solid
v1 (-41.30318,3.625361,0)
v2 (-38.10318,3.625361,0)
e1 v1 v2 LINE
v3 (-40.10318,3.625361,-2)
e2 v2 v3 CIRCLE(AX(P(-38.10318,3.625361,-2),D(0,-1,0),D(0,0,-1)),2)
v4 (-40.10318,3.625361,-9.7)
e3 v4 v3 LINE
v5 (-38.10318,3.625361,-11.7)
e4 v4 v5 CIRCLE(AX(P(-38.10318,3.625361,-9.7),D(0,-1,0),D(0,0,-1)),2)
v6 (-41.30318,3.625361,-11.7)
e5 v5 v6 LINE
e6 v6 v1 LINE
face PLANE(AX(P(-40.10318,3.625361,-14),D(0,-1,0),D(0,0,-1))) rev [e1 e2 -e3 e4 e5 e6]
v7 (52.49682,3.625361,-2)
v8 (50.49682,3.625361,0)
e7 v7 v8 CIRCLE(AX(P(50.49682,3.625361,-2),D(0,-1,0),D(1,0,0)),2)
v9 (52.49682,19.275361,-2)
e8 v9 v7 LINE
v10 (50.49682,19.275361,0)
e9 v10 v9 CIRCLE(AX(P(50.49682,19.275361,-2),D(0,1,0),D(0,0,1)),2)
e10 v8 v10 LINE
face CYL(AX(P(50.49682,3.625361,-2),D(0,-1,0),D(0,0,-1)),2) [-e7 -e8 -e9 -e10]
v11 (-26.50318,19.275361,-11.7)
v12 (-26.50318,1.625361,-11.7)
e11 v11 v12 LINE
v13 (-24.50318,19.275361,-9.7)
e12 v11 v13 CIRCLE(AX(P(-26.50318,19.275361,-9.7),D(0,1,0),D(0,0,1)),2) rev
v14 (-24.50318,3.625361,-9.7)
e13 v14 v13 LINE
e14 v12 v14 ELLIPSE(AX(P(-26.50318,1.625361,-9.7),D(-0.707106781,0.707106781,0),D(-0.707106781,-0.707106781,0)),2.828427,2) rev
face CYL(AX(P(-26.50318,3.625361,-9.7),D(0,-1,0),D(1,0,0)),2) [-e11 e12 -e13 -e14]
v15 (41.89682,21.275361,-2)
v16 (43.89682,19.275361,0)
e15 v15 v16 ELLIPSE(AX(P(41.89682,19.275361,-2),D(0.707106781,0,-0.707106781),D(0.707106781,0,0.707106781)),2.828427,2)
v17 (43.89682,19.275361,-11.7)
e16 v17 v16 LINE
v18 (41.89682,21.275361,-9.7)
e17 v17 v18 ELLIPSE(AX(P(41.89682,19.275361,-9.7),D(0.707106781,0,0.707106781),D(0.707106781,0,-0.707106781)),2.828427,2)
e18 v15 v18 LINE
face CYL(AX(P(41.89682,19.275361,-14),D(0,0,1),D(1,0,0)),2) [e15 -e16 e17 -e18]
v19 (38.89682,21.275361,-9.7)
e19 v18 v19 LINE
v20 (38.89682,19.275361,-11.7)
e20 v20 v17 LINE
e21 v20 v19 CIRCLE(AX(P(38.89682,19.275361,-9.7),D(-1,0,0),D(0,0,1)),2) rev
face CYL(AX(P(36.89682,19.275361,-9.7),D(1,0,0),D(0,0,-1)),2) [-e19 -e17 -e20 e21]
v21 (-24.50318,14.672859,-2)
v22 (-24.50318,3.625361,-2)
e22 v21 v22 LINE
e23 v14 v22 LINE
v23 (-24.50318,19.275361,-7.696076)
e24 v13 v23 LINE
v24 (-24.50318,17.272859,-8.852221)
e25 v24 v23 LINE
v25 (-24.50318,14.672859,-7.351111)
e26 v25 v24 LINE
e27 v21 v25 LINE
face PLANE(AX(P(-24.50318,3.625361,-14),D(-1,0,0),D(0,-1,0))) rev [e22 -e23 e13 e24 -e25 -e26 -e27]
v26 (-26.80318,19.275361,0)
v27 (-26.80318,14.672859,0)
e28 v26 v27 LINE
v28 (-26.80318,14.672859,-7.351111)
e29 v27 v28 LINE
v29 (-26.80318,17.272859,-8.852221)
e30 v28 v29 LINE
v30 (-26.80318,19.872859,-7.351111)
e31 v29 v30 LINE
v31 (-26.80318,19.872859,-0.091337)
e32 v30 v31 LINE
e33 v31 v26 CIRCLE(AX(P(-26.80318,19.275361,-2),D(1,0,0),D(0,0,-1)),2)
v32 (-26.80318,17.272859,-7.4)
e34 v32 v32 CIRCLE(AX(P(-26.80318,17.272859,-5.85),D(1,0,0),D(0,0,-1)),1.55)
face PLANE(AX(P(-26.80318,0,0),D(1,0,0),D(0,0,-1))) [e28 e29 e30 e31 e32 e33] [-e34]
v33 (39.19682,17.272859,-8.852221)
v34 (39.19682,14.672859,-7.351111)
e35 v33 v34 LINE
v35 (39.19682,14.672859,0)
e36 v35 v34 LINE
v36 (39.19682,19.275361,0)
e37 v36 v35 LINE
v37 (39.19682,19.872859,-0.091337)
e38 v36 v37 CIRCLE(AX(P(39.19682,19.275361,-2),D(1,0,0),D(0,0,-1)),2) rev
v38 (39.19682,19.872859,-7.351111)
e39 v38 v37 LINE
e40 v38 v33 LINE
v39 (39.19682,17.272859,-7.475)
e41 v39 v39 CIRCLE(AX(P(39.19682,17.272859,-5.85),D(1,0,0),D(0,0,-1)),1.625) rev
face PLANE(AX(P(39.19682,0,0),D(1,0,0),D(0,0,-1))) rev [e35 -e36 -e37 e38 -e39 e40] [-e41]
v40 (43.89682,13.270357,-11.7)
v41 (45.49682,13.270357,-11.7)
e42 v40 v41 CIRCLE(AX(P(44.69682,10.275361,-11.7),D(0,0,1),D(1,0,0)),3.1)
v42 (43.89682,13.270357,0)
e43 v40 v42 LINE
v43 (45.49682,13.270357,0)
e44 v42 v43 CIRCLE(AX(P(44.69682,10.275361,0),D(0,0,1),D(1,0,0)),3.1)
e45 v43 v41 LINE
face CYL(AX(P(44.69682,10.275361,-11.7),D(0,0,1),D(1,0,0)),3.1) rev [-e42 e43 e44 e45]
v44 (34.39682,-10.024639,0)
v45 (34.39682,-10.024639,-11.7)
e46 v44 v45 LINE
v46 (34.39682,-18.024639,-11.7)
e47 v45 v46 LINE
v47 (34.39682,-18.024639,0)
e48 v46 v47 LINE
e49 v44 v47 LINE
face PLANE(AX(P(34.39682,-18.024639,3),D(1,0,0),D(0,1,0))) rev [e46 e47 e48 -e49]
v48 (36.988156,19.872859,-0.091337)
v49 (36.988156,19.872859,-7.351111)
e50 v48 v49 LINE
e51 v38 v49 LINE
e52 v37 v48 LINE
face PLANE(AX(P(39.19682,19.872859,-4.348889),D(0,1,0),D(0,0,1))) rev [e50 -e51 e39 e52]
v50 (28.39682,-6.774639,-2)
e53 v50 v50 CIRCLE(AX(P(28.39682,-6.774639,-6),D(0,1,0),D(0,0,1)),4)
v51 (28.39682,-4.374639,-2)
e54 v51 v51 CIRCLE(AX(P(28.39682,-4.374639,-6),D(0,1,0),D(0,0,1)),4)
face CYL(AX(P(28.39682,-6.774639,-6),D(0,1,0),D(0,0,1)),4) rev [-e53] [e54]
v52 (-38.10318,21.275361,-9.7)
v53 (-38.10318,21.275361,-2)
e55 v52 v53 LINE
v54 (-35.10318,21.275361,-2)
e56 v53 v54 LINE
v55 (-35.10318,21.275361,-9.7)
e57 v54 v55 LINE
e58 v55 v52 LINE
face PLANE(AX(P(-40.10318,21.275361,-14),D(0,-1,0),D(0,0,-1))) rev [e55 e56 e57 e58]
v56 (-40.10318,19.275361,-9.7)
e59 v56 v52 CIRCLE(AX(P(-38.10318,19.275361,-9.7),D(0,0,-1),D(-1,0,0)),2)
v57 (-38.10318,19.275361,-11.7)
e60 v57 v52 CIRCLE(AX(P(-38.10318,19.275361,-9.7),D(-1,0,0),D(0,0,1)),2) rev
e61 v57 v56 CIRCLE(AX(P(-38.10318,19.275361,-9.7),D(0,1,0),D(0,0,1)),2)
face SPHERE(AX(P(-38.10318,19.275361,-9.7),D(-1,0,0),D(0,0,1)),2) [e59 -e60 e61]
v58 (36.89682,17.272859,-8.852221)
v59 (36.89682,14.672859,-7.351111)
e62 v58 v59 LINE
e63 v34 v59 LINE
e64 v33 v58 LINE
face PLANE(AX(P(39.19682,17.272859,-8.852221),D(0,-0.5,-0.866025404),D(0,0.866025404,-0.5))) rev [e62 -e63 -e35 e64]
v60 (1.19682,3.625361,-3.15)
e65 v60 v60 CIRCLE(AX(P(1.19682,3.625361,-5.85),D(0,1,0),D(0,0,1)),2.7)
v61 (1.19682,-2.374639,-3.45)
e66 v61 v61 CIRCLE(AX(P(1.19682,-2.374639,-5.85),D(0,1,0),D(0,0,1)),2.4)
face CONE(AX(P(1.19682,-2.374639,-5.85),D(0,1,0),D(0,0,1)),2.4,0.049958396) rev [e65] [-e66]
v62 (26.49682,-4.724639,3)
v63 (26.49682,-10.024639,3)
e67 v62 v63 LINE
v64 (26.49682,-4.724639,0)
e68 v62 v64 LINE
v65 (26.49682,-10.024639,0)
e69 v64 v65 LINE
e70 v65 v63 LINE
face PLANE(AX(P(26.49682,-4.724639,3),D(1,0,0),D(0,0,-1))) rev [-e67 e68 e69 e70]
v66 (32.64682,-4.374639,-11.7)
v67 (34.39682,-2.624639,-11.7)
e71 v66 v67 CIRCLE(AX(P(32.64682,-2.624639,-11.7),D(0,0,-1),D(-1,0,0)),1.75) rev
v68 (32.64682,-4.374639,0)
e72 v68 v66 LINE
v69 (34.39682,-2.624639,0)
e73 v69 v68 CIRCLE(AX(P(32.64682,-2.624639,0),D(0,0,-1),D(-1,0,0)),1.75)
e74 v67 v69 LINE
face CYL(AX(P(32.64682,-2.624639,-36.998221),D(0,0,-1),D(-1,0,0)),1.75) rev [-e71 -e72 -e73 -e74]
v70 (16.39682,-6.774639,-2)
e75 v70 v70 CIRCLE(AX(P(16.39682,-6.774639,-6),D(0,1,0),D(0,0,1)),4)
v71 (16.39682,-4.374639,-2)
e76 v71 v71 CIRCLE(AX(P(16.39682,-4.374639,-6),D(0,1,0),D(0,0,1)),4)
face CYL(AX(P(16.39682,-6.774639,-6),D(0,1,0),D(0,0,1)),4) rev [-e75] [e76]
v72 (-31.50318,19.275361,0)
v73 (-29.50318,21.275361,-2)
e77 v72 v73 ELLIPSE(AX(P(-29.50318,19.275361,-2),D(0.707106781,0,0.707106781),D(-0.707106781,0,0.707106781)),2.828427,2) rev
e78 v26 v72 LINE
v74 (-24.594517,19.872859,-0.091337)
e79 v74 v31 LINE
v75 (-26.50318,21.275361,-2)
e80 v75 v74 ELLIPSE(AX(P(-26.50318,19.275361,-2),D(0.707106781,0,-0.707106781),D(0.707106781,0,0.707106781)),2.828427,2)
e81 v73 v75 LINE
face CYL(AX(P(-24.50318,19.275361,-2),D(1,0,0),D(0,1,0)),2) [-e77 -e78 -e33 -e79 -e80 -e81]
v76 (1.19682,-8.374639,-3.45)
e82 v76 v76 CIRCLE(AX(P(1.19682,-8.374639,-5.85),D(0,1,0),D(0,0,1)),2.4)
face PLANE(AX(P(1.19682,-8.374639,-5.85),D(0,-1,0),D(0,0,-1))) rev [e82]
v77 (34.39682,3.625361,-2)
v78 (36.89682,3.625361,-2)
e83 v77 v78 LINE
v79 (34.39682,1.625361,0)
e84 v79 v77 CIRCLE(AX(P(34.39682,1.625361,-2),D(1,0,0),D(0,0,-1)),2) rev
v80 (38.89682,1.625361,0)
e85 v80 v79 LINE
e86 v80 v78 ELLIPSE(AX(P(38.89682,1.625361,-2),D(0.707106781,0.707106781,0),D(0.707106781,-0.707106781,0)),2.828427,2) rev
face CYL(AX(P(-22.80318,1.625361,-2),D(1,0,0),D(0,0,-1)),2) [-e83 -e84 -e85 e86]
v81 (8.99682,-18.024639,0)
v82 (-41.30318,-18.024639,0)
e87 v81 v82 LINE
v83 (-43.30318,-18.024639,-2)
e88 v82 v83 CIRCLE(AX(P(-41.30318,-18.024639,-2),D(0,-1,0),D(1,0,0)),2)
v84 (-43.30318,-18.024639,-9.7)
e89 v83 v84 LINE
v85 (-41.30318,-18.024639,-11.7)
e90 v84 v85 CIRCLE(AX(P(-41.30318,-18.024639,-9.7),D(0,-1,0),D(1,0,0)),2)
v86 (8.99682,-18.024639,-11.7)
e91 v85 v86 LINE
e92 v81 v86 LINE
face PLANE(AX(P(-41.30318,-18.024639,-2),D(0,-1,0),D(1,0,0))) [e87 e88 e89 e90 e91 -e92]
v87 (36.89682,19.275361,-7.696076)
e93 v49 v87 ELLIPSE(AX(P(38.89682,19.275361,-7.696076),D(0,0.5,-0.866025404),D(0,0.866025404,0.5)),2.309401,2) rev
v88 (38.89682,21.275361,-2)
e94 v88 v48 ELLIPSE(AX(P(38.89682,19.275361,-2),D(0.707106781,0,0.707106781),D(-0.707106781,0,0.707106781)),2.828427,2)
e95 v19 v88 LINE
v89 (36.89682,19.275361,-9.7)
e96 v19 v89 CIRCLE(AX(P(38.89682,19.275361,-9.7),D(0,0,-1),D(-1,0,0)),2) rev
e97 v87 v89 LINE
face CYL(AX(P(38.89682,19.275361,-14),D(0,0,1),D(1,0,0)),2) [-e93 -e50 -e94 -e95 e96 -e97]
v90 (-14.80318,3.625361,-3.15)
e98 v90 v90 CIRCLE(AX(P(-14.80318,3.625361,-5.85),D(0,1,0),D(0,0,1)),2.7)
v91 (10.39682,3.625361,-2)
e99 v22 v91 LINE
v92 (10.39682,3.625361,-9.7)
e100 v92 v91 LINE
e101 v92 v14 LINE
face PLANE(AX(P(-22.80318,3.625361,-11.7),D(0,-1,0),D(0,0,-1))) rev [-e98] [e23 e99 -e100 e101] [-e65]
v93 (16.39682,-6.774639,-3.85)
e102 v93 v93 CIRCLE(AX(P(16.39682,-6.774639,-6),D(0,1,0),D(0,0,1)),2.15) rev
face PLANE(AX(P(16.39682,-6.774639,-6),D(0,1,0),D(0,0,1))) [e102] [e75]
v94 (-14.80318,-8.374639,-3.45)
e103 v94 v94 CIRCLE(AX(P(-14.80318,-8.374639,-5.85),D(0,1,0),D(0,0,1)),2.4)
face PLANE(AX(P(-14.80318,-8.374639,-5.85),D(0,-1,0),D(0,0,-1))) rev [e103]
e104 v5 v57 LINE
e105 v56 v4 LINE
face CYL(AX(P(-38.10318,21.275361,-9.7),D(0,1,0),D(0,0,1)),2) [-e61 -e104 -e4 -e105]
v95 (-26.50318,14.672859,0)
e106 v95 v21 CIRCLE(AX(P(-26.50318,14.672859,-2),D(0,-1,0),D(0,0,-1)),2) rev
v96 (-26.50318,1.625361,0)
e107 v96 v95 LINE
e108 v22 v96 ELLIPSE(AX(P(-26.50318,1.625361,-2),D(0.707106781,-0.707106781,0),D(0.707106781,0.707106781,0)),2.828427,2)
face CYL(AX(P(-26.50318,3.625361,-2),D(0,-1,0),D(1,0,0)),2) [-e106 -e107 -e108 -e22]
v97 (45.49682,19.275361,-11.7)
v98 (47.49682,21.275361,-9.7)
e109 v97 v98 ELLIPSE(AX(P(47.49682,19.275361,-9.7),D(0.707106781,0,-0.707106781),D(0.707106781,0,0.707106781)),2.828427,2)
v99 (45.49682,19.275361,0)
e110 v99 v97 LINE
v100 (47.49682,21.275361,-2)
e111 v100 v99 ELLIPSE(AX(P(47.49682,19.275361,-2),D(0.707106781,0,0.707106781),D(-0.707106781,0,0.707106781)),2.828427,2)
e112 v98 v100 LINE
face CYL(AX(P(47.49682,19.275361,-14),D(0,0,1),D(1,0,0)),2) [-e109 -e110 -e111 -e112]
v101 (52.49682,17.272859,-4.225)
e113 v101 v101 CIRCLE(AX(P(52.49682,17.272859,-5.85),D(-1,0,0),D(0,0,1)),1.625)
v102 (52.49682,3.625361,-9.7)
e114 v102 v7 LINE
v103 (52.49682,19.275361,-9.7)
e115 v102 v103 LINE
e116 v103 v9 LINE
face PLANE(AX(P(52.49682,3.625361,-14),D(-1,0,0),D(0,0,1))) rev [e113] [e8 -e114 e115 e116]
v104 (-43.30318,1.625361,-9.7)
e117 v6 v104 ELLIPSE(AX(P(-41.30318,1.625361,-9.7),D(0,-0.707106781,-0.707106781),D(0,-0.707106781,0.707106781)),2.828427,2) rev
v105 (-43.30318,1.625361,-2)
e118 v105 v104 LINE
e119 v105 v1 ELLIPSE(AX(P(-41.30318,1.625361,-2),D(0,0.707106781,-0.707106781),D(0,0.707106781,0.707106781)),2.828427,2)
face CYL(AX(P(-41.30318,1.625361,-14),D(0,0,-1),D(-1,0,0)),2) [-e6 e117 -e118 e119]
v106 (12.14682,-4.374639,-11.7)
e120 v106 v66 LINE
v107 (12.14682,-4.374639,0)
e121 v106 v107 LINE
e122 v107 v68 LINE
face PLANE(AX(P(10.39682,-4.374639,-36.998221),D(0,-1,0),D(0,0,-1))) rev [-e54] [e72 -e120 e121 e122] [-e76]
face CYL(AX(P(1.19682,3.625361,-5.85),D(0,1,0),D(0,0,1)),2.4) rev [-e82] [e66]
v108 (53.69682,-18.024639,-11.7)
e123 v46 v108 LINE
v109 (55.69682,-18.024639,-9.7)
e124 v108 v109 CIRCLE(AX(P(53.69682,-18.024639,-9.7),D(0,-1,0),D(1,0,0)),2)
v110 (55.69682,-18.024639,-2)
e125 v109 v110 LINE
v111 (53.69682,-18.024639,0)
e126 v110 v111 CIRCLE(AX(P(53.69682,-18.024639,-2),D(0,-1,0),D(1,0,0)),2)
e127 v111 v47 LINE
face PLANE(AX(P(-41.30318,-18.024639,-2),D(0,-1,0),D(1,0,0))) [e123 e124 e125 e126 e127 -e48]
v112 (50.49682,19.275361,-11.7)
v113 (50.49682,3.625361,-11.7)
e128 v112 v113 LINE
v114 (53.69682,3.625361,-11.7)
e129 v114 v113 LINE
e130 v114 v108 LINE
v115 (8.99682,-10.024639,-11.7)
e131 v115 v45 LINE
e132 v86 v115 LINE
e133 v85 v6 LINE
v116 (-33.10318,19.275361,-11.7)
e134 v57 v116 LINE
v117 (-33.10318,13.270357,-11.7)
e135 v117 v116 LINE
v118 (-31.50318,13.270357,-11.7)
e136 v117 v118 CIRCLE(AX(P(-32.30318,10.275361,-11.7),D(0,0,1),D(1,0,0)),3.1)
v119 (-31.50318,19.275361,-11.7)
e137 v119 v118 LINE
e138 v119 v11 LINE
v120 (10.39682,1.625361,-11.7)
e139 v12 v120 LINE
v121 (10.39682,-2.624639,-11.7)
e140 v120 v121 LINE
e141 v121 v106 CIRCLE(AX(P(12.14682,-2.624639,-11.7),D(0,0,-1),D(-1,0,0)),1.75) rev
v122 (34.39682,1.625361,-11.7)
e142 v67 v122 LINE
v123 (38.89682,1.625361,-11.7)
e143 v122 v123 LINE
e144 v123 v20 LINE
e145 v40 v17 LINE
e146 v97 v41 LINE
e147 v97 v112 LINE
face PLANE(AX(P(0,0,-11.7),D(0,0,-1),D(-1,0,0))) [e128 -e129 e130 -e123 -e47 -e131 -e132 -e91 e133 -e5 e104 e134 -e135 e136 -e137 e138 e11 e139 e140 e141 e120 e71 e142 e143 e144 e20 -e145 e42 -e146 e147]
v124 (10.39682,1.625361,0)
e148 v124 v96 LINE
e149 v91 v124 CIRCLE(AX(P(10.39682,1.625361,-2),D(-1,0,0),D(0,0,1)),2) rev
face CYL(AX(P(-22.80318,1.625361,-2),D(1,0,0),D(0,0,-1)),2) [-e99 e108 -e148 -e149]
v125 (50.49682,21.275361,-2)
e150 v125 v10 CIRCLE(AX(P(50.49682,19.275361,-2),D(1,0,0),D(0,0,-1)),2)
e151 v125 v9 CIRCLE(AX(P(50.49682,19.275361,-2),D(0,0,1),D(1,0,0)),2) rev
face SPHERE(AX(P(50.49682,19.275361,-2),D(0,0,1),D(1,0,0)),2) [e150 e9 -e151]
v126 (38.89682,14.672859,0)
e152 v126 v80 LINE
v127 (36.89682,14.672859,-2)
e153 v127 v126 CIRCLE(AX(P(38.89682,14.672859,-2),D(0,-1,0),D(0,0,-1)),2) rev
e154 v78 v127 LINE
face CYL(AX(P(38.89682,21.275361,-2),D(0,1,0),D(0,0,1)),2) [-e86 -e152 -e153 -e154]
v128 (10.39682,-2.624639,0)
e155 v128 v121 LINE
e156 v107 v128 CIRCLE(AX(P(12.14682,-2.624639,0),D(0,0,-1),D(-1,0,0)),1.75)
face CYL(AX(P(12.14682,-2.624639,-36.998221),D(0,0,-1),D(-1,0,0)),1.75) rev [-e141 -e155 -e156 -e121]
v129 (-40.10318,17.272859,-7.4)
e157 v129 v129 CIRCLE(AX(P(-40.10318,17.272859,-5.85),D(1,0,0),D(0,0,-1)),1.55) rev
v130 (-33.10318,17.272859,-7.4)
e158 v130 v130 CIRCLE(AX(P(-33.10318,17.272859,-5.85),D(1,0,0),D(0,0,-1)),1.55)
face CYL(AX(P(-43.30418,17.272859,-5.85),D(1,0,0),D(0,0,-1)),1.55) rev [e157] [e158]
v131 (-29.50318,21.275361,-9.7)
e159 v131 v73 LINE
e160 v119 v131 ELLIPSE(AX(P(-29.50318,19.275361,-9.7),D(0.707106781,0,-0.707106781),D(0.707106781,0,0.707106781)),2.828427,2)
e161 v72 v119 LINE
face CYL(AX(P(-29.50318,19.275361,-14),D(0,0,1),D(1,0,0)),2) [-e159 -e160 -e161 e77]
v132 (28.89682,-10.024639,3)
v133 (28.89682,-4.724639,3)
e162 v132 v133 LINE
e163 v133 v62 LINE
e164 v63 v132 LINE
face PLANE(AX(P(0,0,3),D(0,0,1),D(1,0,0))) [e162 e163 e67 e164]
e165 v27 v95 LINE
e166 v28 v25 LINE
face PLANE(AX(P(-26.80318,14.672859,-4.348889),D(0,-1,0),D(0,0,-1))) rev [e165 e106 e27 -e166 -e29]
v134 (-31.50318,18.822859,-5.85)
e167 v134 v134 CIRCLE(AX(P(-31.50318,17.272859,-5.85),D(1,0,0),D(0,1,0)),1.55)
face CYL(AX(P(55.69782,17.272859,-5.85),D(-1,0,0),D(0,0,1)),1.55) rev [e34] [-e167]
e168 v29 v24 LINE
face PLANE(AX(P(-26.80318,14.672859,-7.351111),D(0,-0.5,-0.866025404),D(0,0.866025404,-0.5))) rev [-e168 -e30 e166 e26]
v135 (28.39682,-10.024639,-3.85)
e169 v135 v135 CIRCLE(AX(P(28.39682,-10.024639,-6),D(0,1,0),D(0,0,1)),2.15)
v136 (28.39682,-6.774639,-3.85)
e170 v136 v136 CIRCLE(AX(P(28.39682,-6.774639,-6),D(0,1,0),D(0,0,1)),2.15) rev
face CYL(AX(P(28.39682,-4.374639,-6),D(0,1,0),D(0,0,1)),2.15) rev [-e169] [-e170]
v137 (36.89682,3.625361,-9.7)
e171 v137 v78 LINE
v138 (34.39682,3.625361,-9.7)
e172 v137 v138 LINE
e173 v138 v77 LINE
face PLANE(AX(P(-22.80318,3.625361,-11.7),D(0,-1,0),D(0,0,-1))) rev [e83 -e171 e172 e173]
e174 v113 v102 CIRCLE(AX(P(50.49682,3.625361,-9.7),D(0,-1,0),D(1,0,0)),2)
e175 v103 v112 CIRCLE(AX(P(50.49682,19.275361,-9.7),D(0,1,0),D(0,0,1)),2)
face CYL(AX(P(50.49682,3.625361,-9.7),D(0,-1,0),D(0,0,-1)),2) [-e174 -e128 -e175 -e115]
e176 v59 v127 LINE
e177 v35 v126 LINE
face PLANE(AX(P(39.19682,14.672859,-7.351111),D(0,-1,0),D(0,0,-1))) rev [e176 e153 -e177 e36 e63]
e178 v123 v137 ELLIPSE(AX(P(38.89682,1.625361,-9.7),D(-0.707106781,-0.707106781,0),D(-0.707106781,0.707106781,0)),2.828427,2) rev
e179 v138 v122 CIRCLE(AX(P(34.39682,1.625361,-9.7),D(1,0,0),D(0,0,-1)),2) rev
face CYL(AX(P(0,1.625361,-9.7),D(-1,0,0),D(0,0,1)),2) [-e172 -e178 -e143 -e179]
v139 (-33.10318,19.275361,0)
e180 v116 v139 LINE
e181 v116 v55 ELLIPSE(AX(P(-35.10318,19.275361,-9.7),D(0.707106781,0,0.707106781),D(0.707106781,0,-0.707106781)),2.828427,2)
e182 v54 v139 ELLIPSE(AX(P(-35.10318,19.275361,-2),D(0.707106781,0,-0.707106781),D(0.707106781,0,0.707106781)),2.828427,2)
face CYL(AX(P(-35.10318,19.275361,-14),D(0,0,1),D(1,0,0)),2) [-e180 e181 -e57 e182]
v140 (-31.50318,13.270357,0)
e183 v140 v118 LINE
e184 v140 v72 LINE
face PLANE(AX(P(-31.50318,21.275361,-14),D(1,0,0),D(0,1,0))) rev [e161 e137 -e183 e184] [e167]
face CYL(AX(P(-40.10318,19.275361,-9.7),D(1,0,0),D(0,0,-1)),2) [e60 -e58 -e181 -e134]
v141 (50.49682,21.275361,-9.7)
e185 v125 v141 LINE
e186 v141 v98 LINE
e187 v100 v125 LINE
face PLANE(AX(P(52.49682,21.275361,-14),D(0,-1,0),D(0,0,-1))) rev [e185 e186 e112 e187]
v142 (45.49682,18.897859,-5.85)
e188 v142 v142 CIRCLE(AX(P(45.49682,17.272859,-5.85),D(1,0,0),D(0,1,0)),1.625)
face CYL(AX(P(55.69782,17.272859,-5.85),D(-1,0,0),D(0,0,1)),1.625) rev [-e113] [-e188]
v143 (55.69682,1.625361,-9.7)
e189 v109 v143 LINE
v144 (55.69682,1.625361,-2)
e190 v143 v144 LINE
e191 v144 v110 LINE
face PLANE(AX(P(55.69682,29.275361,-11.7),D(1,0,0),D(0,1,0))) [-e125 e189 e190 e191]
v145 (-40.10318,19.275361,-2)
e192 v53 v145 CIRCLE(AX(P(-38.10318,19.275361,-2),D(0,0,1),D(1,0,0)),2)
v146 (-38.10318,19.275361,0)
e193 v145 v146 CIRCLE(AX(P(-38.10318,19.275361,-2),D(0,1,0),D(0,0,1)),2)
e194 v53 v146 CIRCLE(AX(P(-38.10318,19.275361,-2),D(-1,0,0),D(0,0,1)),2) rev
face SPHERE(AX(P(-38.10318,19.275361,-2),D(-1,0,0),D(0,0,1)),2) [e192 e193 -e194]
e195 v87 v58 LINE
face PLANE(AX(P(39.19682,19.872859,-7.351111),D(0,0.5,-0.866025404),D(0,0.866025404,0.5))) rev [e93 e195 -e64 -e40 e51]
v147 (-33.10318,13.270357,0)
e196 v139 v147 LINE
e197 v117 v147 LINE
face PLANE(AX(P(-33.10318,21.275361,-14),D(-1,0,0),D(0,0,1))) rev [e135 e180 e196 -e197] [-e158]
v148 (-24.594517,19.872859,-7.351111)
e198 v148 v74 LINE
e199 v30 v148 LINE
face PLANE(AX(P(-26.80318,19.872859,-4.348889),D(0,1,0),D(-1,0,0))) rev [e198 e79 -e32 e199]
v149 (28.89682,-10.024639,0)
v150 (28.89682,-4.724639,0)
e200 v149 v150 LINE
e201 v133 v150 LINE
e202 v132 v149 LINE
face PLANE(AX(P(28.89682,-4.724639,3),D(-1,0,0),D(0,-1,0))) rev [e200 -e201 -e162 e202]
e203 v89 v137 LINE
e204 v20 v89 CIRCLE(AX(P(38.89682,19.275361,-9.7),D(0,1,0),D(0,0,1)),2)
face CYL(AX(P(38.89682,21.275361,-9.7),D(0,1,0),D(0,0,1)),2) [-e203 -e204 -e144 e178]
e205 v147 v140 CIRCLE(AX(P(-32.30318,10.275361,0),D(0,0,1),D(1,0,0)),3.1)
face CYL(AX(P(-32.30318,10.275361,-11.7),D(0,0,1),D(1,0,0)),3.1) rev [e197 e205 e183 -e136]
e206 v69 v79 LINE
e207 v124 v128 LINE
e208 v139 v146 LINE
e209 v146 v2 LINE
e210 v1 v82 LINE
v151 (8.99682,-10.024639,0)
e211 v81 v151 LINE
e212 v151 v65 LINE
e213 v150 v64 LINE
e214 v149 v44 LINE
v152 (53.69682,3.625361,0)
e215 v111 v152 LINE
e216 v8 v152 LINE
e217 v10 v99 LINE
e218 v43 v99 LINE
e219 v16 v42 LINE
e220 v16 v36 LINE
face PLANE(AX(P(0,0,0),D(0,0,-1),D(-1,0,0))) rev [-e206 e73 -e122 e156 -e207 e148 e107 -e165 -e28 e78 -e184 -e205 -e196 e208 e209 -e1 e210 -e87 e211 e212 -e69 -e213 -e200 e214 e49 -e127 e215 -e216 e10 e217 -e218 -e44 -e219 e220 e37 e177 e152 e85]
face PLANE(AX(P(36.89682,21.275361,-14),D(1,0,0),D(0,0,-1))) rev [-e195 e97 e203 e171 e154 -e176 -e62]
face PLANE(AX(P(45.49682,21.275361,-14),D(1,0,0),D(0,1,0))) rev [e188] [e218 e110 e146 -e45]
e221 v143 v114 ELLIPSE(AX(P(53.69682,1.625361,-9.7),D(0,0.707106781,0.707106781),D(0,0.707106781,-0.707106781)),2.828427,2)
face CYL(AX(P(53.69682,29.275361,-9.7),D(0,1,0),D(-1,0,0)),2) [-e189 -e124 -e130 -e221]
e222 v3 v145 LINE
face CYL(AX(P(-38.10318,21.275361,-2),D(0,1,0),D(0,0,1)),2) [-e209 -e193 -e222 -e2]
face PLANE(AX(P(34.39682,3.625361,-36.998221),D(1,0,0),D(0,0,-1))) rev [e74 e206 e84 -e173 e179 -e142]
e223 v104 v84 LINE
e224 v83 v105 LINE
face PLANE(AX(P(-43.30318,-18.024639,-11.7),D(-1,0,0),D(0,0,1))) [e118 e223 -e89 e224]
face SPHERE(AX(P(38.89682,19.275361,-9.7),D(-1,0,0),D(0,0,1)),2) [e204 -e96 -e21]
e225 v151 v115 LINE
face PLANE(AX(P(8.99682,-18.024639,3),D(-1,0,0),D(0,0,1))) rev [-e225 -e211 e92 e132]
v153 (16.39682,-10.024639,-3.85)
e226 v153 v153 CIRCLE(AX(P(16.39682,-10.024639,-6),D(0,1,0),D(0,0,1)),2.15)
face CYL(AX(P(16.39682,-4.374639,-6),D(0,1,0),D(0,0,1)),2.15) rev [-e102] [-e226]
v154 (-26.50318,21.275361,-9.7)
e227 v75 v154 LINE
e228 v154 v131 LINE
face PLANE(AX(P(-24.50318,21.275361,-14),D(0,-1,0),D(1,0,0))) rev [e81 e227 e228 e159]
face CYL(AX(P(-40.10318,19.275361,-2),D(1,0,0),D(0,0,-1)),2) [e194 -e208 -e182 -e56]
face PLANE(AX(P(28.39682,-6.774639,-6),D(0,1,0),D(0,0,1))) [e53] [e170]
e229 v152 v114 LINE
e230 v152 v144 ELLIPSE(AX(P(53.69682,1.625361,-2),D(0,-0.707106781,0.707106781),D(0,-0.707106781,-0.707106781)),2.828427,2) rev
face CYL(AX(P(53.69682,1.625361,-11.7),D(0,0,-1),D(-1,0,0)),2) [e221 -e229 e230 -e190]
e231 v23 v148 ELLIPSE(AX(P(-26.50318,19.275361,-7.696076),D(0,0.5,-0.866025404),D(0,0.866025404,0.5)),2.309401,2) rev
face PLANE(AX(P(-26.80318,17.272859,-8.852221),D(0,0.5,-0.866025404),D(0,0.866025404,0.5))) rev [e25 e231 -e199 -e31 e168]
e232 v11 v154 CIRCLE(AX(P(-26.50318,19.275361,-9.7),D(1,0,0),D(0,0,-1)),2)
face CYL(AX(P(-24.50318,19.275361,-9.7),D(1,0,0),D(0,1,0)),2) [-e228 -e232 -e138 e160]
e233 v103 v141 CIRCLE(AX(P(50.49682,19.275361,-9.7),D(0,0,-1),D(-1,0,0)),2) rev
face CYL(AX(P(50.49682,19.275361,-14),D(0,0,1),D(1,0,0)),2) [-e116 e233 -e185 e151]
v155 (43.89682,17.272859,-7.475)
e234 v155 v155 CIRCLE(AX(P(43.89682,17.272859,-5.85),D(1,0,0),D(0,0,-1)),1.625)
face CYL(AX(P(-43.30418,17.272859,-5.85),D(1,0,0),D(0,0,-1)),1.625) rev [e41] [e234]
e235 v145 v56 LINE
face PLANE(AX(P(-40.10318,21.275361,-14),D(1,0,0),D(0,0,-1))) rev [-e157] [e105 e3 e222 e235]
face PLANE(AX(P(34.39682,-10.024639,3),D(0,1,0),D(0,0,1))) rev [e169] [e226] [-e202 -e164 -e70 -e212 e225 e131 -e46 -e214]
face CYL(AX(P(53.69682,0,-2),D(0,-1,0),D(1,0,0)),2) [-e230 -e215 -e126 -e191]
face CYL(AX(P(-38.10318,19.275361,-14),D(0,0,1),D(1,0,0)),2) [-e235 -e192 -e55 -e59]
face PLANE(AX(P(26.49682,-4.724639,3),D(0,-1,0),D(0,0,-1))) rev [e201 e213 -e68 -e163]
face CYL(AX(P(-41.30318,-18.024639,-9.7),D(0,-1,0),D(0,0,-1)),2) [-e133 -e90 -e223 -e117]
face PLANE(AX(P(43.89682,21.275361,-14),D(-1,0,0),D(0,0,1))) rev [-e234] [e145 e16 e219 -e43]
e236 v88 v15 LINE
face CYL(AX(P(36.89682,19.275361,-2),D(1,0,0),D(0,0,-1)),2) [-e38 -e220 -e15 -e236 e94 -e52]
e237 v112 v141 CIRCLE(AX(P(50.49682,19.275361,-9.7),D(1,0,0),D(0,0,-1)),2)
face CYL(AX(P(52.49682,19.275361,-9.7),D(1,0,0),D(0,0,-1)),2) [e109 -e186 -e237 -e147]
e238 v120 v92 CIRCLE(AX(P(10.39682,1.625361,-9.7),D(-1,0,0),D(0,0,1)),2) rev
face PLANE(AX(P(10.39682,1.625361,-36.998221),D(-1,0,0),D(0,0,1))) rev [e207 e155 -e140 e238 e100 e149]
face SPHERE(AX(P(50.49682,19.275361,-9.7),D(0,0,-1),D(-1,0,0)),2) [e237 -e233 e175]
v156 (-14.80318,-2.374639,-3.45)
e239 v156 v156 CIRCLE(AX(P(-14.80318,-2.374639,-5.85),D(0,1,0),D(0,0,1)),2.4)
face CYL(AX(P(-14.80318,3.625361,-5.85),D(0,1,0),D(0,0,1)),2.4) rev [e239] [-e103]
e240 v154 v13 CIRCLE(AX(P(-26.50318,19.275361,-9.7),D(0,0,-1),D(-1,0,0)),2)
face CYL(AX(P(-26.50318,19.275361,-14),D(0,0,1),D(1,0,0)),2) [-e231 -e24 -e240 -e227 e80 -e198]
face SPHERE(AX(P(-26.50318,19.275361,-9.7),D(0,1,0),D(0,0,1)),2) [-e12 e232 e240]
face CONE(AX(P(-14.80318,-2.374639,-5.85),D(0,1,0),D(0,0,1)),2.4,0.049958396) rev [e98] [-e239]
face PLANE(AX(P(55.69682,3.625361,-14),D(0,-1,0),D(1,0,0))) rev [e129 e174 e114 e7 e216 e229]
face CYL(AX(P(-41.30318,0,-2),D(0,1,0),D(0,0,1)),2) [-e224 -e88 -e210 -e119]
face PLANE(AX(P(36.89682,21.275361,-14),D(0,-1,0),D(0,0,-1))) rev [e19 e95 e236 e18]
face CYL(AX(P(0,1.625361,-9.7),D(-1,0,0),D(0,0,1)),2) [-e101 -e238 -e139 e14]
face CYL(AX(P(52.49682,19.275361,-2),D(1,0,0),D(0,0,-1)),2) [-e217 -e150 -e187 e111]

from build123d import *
from OCP.BRepFilletAPI import BRepFilletAPI_MakeChamfer
from build123d.topology import SkipClean

# Parameters (mm, degrees)
SKETCH1_R                      = 3.1
SKETCH1_R_2                    = 3.5
SKETCH1_W                      = 32
SKETCH1_H                      = 15.65
BOSS_EXTRUDE1_DEPTH            = 11.7
CUT_EXTRUDE5_DEPTH             = 14
CUT_EXTRUDE8_REACH             = 96.23
SKETCH10_R                     = 1.55
CUT_EXTRUDE8_DIRECTION_2_REACH = 96.23
CUT_EXTRUDE9_REACH             = 94.724
SKETCH11_R                     = 1.625
CUT_EXTRUDE9_DIRECTION_2_REACH = 94.724
CUT_EXTRUDE10_DEPTH            = 2.3
CUT_EXTRUDE11_DEPTH            = 2.3
HOLE1_D                        = 4.8
HOLE1_DEPTH                    = 12
HOLE1_CBORE_D                  = 5.4
HOLE1_CBORE_DEPTH              = 6
CUT_EXTRUDE17_REACH            = 66.001
SKETCH30_W                     = 59.4
SKETCH30_H                     = 25.65
SKETCH32_W                     = 99
SKETCH32_H                     = 8
CUT_EXTRUDE20_DEPTH            = 65.000566
CHAMFER1_SIZE                  = 6
CHAMFER1_SIZE_2                = 0.3
FILLET1_R                      = 2
SKETCH33_W                     = 2.4
SKETCH33_H                     = 5.3
BOSS_EXTRUDE2_DEPTH            = 3
SKETCH34_W                     = 99
SKETCH34_H                     = 8
CUT_EXTRUDE21_DEPTH            = 61.759087
CUT_EXTRUDE22_START            = -11.7
CUT_EXTRUDE22_DEPTH            = 11.7
BOSS_EXTRUDE4_DEPTH            = 8
SKETCH45_W                     = 25.4
SKETCH45_H                     = 8
CUT_EXTRUDE26_DEPTH            = 62.407383
M4_CLEARANCE_HOLE1_D           = 4.3
SKETCH46_2_R                   = 4
CUT_EXTRUDE27_DEPTH            = 2.4
FILLET5_R                      = 1.75


# Some blends are built 0.0001 mm under size
with BuildPart() as part:
    # Sketch1 → Boss-Extrude1 (new body)
    with BuildSketch(Plane.XY):
        Polygon((-43.30318, 29.275361), (25.69682, 29.275361), (55.69682, 29.275361), (55.69682, -18.024639), (-43.30318, -18.024639), align=None)
        with Locations((-32.30318, 10.275361)):
            Circle(SKETCH1_R, mode=Mode.SUBTRACT)
        with Locations((44.69682, 10.275361)):
            Circle(SKETCH1_R, mode=Mode.SUBTRACT)
        with Locations((22.69682, 12.275361)):
            Circle(SKETCH1_R_2, mode=Mode.SUBTRACT)
        with Locations((-6.80318, 11.450361)):
            Rectangle(SKETCH1_W, SKETCH1_H, mode=Mode.SUBTRACT)
    extrude(amount=-BOSS_EXTRUDE1_DEPTH)

    # Sketch7 → Cut-Extrude5 (cut)
    with BuildSketch(Plane.XY):
        with BuildLine():
            Line((-43.30318, 22.775361), (-22.50318, 22.775361))
            Line((-22.50318, 22.775361), (-22.50318, 3.625361))
            Line((-22.50318, 3.625361), (-24.50318, 3.625361))
            Line((-24.50318, 3.625361), (-24.50318, 21.275361))
            Line((-24.50318, 21.275361), (-31.50318, 21.275361))
            Line((-31.50318, 21.275361), (-31.50318, 13.270357))
            ThreePointArc((-31.50318, 13.270357), (-32.30318, 7.175361), (-33.10318, 13.270357))
            Line((-33.10318, 13.270357), (-33.10318, 21.275361))
            Line((-33.10318, 21.275361), (-40.10318, 21.275361))
            Line((-40.10318, 21.275361), (-40.10318, 3.625361))
            Line((-40.10318, 3.625361), (-43.30318, 3.625361))
            Line((-43.30318, 3.625361), (-43.30318, 22.775361))
        make_face()
        with BuildLine():
            Line((34.89682, 22.775361), (55.69682, 22.775361))
            Line((55.69682, 22.775361), (55.69682, 3.625361))
            Line((55.69682, 3.625361), (52.49682, 3.625361))
            Line((52.49682, 3.625361), (52.49682, 21.275361))
            Line((52.49682, 21.275361), (45.49682, 21.275361))
            Line((45.49682, 21.275361), (45.49682, 13.270357))
            ThreePointArc((45.49682, 13.270357), (44.69682, 7.175361), (43.89682, 13.270357))
            Line((43.89682, 13.270357), (43.89682, 21.275361))
            Line((43.89682, 21.275361), (36.89682, 21.275361))
            Line((36.89682, 21.275361), (36.89682, 3.625361))
            Line((36.89682, 3.625361), (34.89682, 3.625361))
            Line((34.89682, 3.625361), (34.89682, 22.775361))
        make_face()
    extrude(amount=-CUT_EXTRUDE5_DEPTH, mode=Mode.SUBTRACT)

    # Sketch10 → Cut-Extrude8 (cut, up to next)
    with BuildSketch(Plane(origin=(-33.10318, 0, 0), x_dir=(0, 0, -1), z_dir=(1, 0, 0)), mode=Mode.PRIVATE) as cut_extrude8_sk1:
        with Locations(Location((5.85, 17.272859, 0), (0, 0, 270))):
            Circle(SKETCH10_R)
    cut_extrude8_tool1 = extrude(cut_extrude8_sk1.sketch, amount=-CUT_EXTRUDE8_REACH, mode=Mode.PRIVATE) & part.part
    add(cut_extrude8_tool1.solids().sort_by_distance((-33.10318, 17.272859, -5.85))[0], mode=Mode.SUBTRACT)

    # Sketch10 → Cut-Extrude8 direction 2 (cut, up to next)
    with BuildSketch(Plane(origin=(-33.10318, 0, 0), x_dir=(0, 0, -1), z_dir=(1, 0, 0)), mode=Mode.PRIVATE) as cut_extrude8_direction_2_sk1:
        with Locations(Location((5.85, 17.272859, 0), (0, 0, 270))):
            Circle(SKETCH10_R)
    cut_extrude8_direction_2_tool1 = extrude(cut_extrude8_direction_2_sk1.sketch, amount=CUT_EXTRUDE8_DIRECTION_2_REACH, mode=Mode.PRIVATE) & part.part
    add(cut_extrude8_direction_2_tool1.solids().sort_by_distance((-33.10318, 17.272859, -5.85))[0], mode=Mode.SUBTRACT)

    # Sketch11 → Cut-Extrude9 (cut, up to next)
    with BuildSketch(Plane(origin=(43.89682, 0, 0), x_dir=(0, 0, -1), z_dir=(1, 0, 0)), mode=Mode.PRIVATE) as cut_extrude9_sk1:
        with Locations(Location((5.85, 17.272859, 0), (0, 0, 180))):
            Circle(SKETCH11_R)
    cut_extrude9_tool1 = extrude(cut_extrude9_sk1.sketch, amount=-CUT_EXTRUDE9_REACH, mode=Mode.PRIVATE) & part.part
    add(cut_extrude9_tool1.solids().sort_by_distance((43.89682, 17.272859, -5.85))[0], mode=Mode.SUBTRACT)

    # Sketch11 → Cut-Extrude9 direction 2 (cut, up to next)
    with BuildSketch(Plane(origin=(43.89682, 0, 0), x_dir=(0, 0, -1), z_dir=(1, 0, 0)), mode=Mode.PRIVATE) as cut_extrude9_direction_2_sk1:
        with Locations(Location((5.85, 17.272859, 0), (0, 0, 180))):
            Circle(SKETCH11_R)
    cut_extrude9_direction_2_tool1 = extrude(cut_extrude9_direction_2_sk1.sketch, amount=CUT_EXTRUDE9_DIRECTION_2_REACH, mode=Mode.PRIVATE) & part.part
    add(cut_extrude9_direction_2_tool1.solids().sort_by_distance((43.89682, 17.272859, -5.85))[0], mode=Mode.SUBTRACT)

    # Sketch12 → Cut-Extrude10 (cut)
    with BuildSketch(Plane.ZY.offset(-36.89682)):
        Polygon((-4.348889, 19.872859), (0, 19.872859), (0, 14.672859), (-4.348889, 14.672859), (-7.351111, 14.672859), (-8.852221, 17.272859), (-7.351111, 19.872859), align=None)
    extrude(amount=-CUT_EXTRUDE10_DEPTH, mode=Mode.SUBTRACT)

    # Sketch13 → Cut-Extrude11 (cut)
    with BuildSketch(Plane(origin=(-24.50318, 0, 0), x_dir=(0, 0, -1), z_dir=(1, 0, 0))):
        Polygon((4.348889, 19.872859), (0, 19.872859), (0, 14.672859), (4.348889, 14.672859), (7.351111, 14.672859), (8.852221, 17.272859), (7.351111, 19.872859), align=None)
    extrude(amount=-CUT_EXTRUDE11_DEPTH, mode=Mode.SUBTRACT)

    # Hole1
    with Locations(Plane(origin=(0, 3.625361, 0), x_dir=(1, 0, 0), z_dir=(0, 1, 0))):
        with Locations((-14.80318, 5.85), (1.19682, 5.85)):
            CounterBoreHole(HOLE1_D / 2, HOLE1_CBORE_D / 2, HOLE1_CBORE_DEPTH, depth=HOLE1_DEPTH)

    # Sketch30 → Cut-Extrude17 (cut, up to next)
    with BuildSketch(Plane(origin=(0, 0, -11.7), x_dir=(-1, 0, 0), z_dir=(0, 0, -1)), mode=Mode.PRIVATE) as cut_extrude17_sk1:
        with Locations((-5.19682, 16.450361)):
            Rectangle(SKETCH30_W, SKETCH30_H)
    cut_extrude17_tool1 = extrude(cut_extrude17_sk1.sketch, amount=-CUT_EXTRUDE17_REACH, mode=Mode.PRIVATE) & part.part
    add(cut_extrude17_tool1.solids().sort_by_distance((5.19682, 16.450361, -11.7))[0], mode=Mode.SUBTRACT)


with BuildPart() as cut_extrude17_piece_1:
    # of the separate pieces the step leaves, piece 1, a body of its own (cut_extrude17_pieces)
    add(part.part.solids().sort_by_distance((-24.50318, 3.625361, 0))[0])

    # Chamfer1
    chamfer1_edges_1 = [cut_extrude17_piece_1.edges().sort_by_distance(p)[0] for p in [
        (-1.50318, -2.374639, -5.85),
    ]]
    chamfer1_side_1 = [cut_extrude17_piece_1.faces().sort_by_distance(p)[0] for p in [
        (-1.50318, -2.368639, -5.85),
    ]]
    chamfer1_edges_2 = [cut_extrude17_piece_1.edges().sort_by_distance(p)[0] for p in [
        (-17.50318, -2.374639, -5.85),
    ]]
    chamfer1_side_2 = [cut_extrude17_piece_1.faces().sort_by_distance(p)[0] for p in [
        (-17.50318, -2.368639, -5.85),
    ]]
    chamfer1 = BRepFilletAPI_MakeChamfer(cut_extrude17_piece_1.part.solid().wrapped)
    for e in chamfer1_edges_1:
        chamfer1.Add(CHAMFER1_SIZE - 0.0001, CHAMFER1_SIZE_2 - 0.0001, e.wrapped, chamfer1_side_1[0].wrapped)
    for e in chamfer1_edges_2:
        chamfer1.Add(CHAMFER1_SIZE - 0.0001, CHAMFER1_SIZE_2 - 0.0001, e.wrapped, chamfer1_side_2[0].wrapped)
    add(Compound.cast(chamfer1.Shape()), mode=Mode.REPLACE)  # a hair under: the kernel refuses the full size

    # Fillet1
    # the kernel refuses this fillet: 2 mm, written as the material it takes off along each edge
    with BuildSketch(Plane(origin=(50.49682, 19.275361, -2), x_dir=(1, 0, 0), z_dir=(0, 1, 0))) as fillet1_piece_1_section:
        Polygon((0, 0), (FILLET1_R, 0), (FILLET1_R, -FILLET1_R), (0, -FILLET1_R), align=None)
    fillet1_piece_1 = extrude(amount=FILLET1_R, mode=Mode.PRIVATE)
    fillet1_piece_1 = fillet1_piece_1 - Plane(origin=(50.49682, 19.275361, -2), x_dir=(-0.7071067811865475, 0, -0.7071067811865475), z_dir=(0, 1, 0)) * Sphere(FILLET1_R, mode=Mode.PRIVATE)
    add(fillet1_piece_1, mode=Mode.SUBTRACT)
    with BuildSketch(Plane(origin=(50.49682, 19.275361, -9.7), x_dir=(1, 0, 0), z_dir=(0, 1, 0))) as fillet1_piece_2_section:
        Polygon((0, 0), (FILLET1_R, 0), (FILLET1_R, FILLET1_R), (0, FILLET1_R), align=None)
    fillet1_piece_2 = extrude(amount=FILLET1_R, mode=Mode.PRIVATE)
    fillet1_piece_2 = fillet1_piece_2 - Plane(origin=(50.49682, 19.275361, -9.7), x_dir=(-0.7071067811865475, 0, 0.7071067811865475), z_dir=(0, 1, 0)) * Sphere(FILLET1_R, mode=Mode.PRIVATE)
    add(fillet1_piece_2, mode=Mode.SUBTRACT)
    with BuildSketch(Plane(origin=(38.89682, 19.275361, -9.7), x_dir=(-1, 0, 0), z_dir=(0, 0, -1))) as fillet1_piece_3_section:
        Polygon((0, 0), (FILLET1_R, 0), (FILLET1_R, FILLET1_R), (0, FILLET1_R), align=None)
    fillet1_piece_3 = extrude(amount=FILLET1_R, mode=Mode.PRIVATE)
    fillet1_piece_3 = fillet1_piece_3 - Plane(origin=(38.89682, 19.275361, -9.7), x_dir=(0.7071067811865475, -0.7071067811865475, 0), z_dir=(0, 0, -1)) * Sphere(FILLET1_R, mode=Mode.PRIVATE)
    add(fillet1_piece_3, mode=Mode.SUBTRACT)
    with BuildSketch(Plane(origin=(-38.10318, 19.275361, -2), x_dir=(0, 1, 0), z_dir=(-1, 0, 0))) as fillet1_piece_4_section:
        Polygon((0, 0), (FILLET1_R, 0), (FILLET1_R, -FILLET1_R), (0, -FILLET1_R), align=None)
    fillet1_piece_4 = extrude(amount=FILLET1_R, mode=Mode.PRIVATE)
    fillet1_piece_4 = fillet1_piece_4 - Plane(origin=(-38.10318, 19.275361, -2), x_dir=(0, -0.7071067811865475, -0.7071067811865475), z_dir=(-1, 0, 0)) * Sphere(FILLET1_R, mode=Mode.PRIVATE)
    add(fillet1_piece_4, mode=Mode.SUBTRACT)
    with BuildSketch(Plane(origin=(-38.10318, 19.275361, -9.7), x_dir=(0, 1, 0), z_dir=(-1, 0, 0))) as fillet1_piece_5_section:
        Polygon((0, 0), (FILLET1_R, 0), (FILLET1_R, FILLET1_R), (0, FILLET1_R), align=None)
    fillet1_piece_5 = extrude(amount=FILLET1_R, mode=Mode.PRIVATE)
    fillet1_piece_5 = fillet1_piece_5 - Plane(origin=(-38.10318, 19.275361, -9.7), x_dir=(0, -0.7071067811865475, 0.7071067811865475), z_dir=(-1, 0, 0)) * Sphere(FILLET1_R, mode=Mode.PRIVATE)
    add(fillet1_piece_5, mode=Mode.SUBTRACT)
    with BuildSketch(Plane(origin=(-26.50318, 19.275361, -9.7), x_dir=(0, 0, -1), z_dir=(1, 0, 0))) as fillet1_piece_6_section:
        Polygon((0, 0), (FILLET1_R, 0), (FILLET1_R, FILLET1_R), (0, FILLET1_R), align=None)
    fillet1_piece_6 = extrude(amount=FILLET1_R, mode=Mode.PRIVATE)
    fillet1_piece_6 = fillet1_piece_6 - Plane(origin=(-26.50318, 19.275361, -9.7), x_dir=(0, -0.7071067811865475, 0.7071067811865475), z_dir=(1, 0, 0)) * Sphere(FILLET1_R, mode=Mode.PRIVATE)
    add(fillet1_piece_6, mode=Mode.SUBTRACT)
    with BuildSketch(Plane(origin=(52.49682, 21.275361, -2), x_dir=(-1, 0, 0), z_dir=(0, 0, -1)), Plane(origin=(-40.10318, 21.275361, -2), x_dir=(0, -1, 0), z_dir=(0, 0, -1))) as fillet1_piece_7:
        with BuildLine():
            CenterArc((FILLET1_R, -FILLET1_R), FILLET1_R, 90, 90)
            Line((0, -FILLET1_R), (0, 0))
            Line((0, 0), (FILLET1_R, 0))
        make_face()
    extrude(amount=7.7, mode=Mode.SUBTRACT)
    with BuildSketch(Plane(origin=(50.49682, 21.275361, 0), x_dir=(0, -1, 0), z_dir=(-1, 0, 0)), Plane(origin=(40.49682, 21.275361, -11.7), x_dir=(0, -1, 0), z_dir=(1, 0, 0)), Plane(origin=(38.89682, 21.275361, -11.7), x_dir=(0, -1, 0), z_dir=(1, 0, 0)), Plane(origin=(-28.10318, 21.275361, 0), x_dir=(0, -1, 0), z_dir=(-1, 0, 0)), Plane(origin=(-38.10318, 21.275361, -11.7), x_dir=(0, -1, 0), z_dir=(1, 0, 0)), Plane(origin=(-36.50318, 21.275361, -11.7), x_dir=(0, -1, 0), z_dir=(1, 0, 0))) as fillet1_piece_8:
        with BuildLine():
            CenterArc((FILLET1_R, -FILLET1_R), FILLET1_R, 90, 90)
            Line((0, -FILLET1_R), (0, 0))
            Line((0, 0), (FILLET1_R, 0))
        make_face()
    extrude(amount=10, mode=Mode.SUBTRACT)
    with BuildSketch(Plane(origin=(45.49682, 21.275361, 5), x_dir=(0, -1, 0), z_dir=(0, 0, -1)), Plane(origin=(43.89682, 21.275361, 5), x_dir=(-1, 0, 0), z_dir=(0, 0, -1)), Plane(origin=(-33.10318, 21.275361, 5), x_dir=(-1, 0, 0), z_dir=(0, 0, -1)), Plane(origin=(55.69682, 3.625361, 5), x_dir=(-1, 0, 0), z_dir=(0, 0, -1)), Plane(origin=(-43.30318, 3.625361, 5), x_dir=(0, -1, 0), z_dir=(0, 0, -1))) as fillet1_piece_9:
        with BuildLine():
            CenterArc((FILLET1_R, -FILLET1_R), FILLET1_R, 90, 90)
            Line((0, -FILLET1_R), (0, 0))
            Line((0, 0), (FILLET1_R, 0))
        make_face()
    extrude(amount=21.7, mode=Mode.SUBTRACT)
    with BuildSketch(Plane(origin=(48.89682, 21.275361, 0), x_dir=(0, -1, 0), z_dir=(-1, 0, 0)), Plane(origin=(-19.50318, 21.275361, 0), x_dir=(0, -1, 0), z_dir=(-1, 0, 0))) as fillet1_piece_10:
        with BuildLine():
            CenterArc((FILLET1_R, -FILLET1_R), FILLET1_R, 90, 90)
            Line((0, -FILLET1_R), (0, 0))
            Line((0, 0), (FILLET1_R, 0))
        make_face()
    extrude(amount=17, mode=Mode.SUBTRACT)
    with BuildSketch(Plane(origin=(36.89682, 21.275361, 5), x_dir=(0, -1, 0), z_dir=(0, 0, -1))) as fillet1_piece_11:
        with BuildLine():
            CenterArc((FILLET1_R, -FILLET1_R), FILLET1_R, 90, 90)
            Line((0, -FILLET1_R), (0, 0))
            Line((0, 0), (FILLET1_R, 0))
        make_face()
    extrude(amount=14.7, mode=Mode.SUBTRACT)
    with BuildSketch(Plane(origin=(-24.50318, 21.275361, 5), x_dir=(0, -1, 0), z_dir=(0, 0, -1))) as fillet1_piece_12:
        with BuildLine():
            CenterArc((FILLET1_R, FILLET1_R), FILLET1_R, 180, 90)
            Line((0, FILLET1_R), (0, 0))
            Line((0, 0), (FILLET1_R, 0))
        make_face()
    extrude(amount=14.7, mode=Mode.SUBTRACT)
    with BuildSketch(Plane(origin=(-31.50318, 21.275361, 5), x_dir=(1, 0, 0), z_dir=(0, 0, -1))) as fillet1_piece_13:
        with BuildLine():
            CenterArc((FILLET1_R, FILLET1_R), FILLET1_R, 180, 90)
            Line((0, FILLET1_R), (0, 0))
            Line((0, 0), (FILLET1_R, 0))
        make_face()
    extrude(amount=21.7, mode=Mode.SUBTRACT)
    with BuildSketch(Plane(origin=(55.69682, 8.625361, 0), x_dir=(-1, 0, 0), z_dir=(0, -1, 0)), Plane(origin=(-43.30318, -23.024639, 0), x_dir=(1, 0, 0), z_dir=(0, 1, 0))) as fillet1_piece_14:
        with BuildLine():
            CenterArc((FILLET1_R, FILLET1_R), FILLET1_R, 180, 90)
            Line((0, FILLET1_R), (0, 0))
            Line((0, 0), (FILLET1_R, 0))
        make_face()
    extrude(amount=31.65, mode=Mode.SUBTRACT)
    with BuildSketch(Plane(origin=(55.69682, 8.625361, -11.7), x_dir=(-1, 0, 0), z_dir=(0, -1, 0)), Plane(origin=(-43.30318, -23.024639, -11.7), x_dir=(1, 0, 0), z_dir=(0, 1, 0))) as fillet1_piece_15:
        with BuildLine():
            CenterArc((FILLET1_R, -FILLET1_R), FILLET1_R, 90, 90)
            Line((0, -FILLET1_R), (0, 0))
            Line((0, 0), (FILLET1_R, 0))
        make_face()
    extrude(amount=31.65, mode=Mode.SUBTRACT)
    with BuildSketch(Plane(origin=(36.89682, 3.625361, -11.7), x_dir=(0, 0, 1), z_dir=(-1, 0, 0))) as fillet1_piece_16:
        with BuildLine():
            CenterArc((FILLET1_R, -FILLET1_R), FILLET1_R, 90, 90)
            Line((0, -FILLET1_R), (0, 0))
            Line((0, 0), (FILLET1_R, 0))
        make_face()
    extrude(amount=61.4, mode=Mode.SUBTRACT)
    with BuildSketch(Plane(origin=(36.89682, 3.625361, 0), x_dir=(0, 0, -1), z_dir=(-1, 0, 0))) as fillet1_piece_17:
        with BuildLine():
            CenterArc((FILLET1_R, FILLET1_R), FILLET1_R, 180, 90)
            Line((0, FILLET1_R), (0, 0))
            Line((0, 0), (FILLET1_R, 0))
        make_face()
    extrude(amount=61.4, mode=Mode.SUBTRACT)
    with BuildSketch(Plane(origin=(36.89682, 19.672859, 0), x_dir=(0, 0, -1), z_dir=(0, -1, 0)), Plane(origin=(-24.50318, 3.625361, 0), x_dir=(0, 0, -1), z_dir=(0, 1, 0))) as fillet1_piece_18:
        with BuildLine():
            CenterArc((FILLET1_R, FILLET1_R), FILLET1_R, 180, 90)
            Line((0, FILLET1_R), (0, 0))
            Line((0, 0), (FILLET1_R, 0))
        make_face()
    extrude(amount=16.047498, mode=Mode.SUBTRACT)
    with BuildSketch(Plane(origin=(52.49682, 3.625361, 0), x_dir=(-1, 0, 0), z_dir=(0, 1, 0)), Plane(origin=(36.89682, 3.625361, -11.7), x_dir=(1, 0, 0), z_dir=(0, 1, 0)), Plane(origin=(52.49682, 19.275361, -11.7), x_dir=(-1, 0, 0), z_dir=(0, -1, 0)), Plane(origin=(-40.10318, 19.275361, 0), x_dir=(1, 0, 0), z_dir=(0, -1, 0)), Plane(origin=(-40.10318, 3.625361, -11.7), x_dir=(1, 0, 0), z_dir=(0, 1, 0))) as fillet1_piece_19:
        with BuildLine():
            CenterArc((FILLET1_R, -FILLET1_R), FILLET1_R, 90, 90)
            Line((0, -FILLET1_R), (0, 0))
            Line((0, 0), (FILLET1_R, 0))
        make_face()
    extrude(amount=15.65, mode=Mode.SUBTRACT)
    with BuildSketch(Plane(origin=(-24.50318, 19.275361, -11.7), x_dir=(0, 0, 1), z_dir=(0, -1, 0))) as fillet1_piece_20:
        with BuildLine():
            CenterArc((FILLET1_R, FILLET1_R), FILLET1_R, 180, 90)
            Line((0, FILLET1_R), (0, 0))
            Line((0, 0), (FILLET1_R, 0))
        make_face()
    extrude(amount=15.65, mode=Mode.SUBTRACT)
    with BuildSketch(Plane(origin=(41.89682, 3.625361, -11.7), x_dir=(0, 0, 1), z_dir=(-1, 0, 0))) as fillet1_piece_21a_section:
        with BuildLine():
            CenterArc((FILLET1_R, -FILLET1_R), FILLET1_R, 90, 90)
            Line((0, -FILLET1_R), (0, 0))
            Line((0, 0), (FILLET1_R, 0))
        make_face()
    fillet1_piece_21a = extrude(amount=66.4, mode=Mode.PRIVATE)
    fillet1_piece_21a = split(fillet1_piece_21a, bisect_by=Plane(origin=(36.89682, 3.625361, -11.7), z_dir=(1, 0, 0)), keep=Keep.TOP, mode=Mode.PRIVATE)
    with BuildSketch(Plane(origin=(36.89682, -1.374639, -11.7), x_dir=(1, 0, 0), z_dir=(0, 1, 0))) as fillet1_piece_21b_section:
        with BuildLine():
            CenterArc((FILLET1_R, -FILLET1_R), FILLET1_R, 90, 90)
            Line((0, -FILLET1_R), (0, 0))
            Line((0, 0), (FILLET1_R, 0))
        make_face()
    fillet1_piece_21b = extrude(amount=20.65, mode=Mode.PRIVATE)
    fillet1_piece_21b = split(fillet1_piece_21b, bisect_by=Plane(origin=(36.89682, 3.625361, -11.7), z_dir=(0, -1, 0)), keep=Keep.TOP, mode=Mode.PRIVATE)
    fillet1_piece_21 = fillet1_piece_21a & fillet1_piece_21b
    add(fillet1_piece_21, mode=Mode.SUBTRACT)
    with BuildSketch(Plane(origin=(36.89682, 3.625361, -11.7), x_dir=(0, 0, 1), z_dir=(-1, 0, 0))) as fillet1_piece_22a_section:
        with BuildLine():
            CenterArc((FILLET1_R, -FILLET1_R), FILLET1_R, 90, 90)
            Line((0, -FILLET1_R), (0, 0))
            Line((0, 0), (FILLET1_R, 0))
        make_face()
    fillet1_piece_22a = extrude(amount=66.4, mode=Mode.PRIVATE)
    fillet1_piece_22a = split(fillet1_piece_22a, bisect_by=Plane(origin=(-24.50318, 3.625361, -11.7), z_dir=(-1, 0, 0)), keep=Keep.TOP, mode=Mode.PRIVATE)
    with BuildSketch(Plane(origin=(-24.50318, 19.275361, -11.7), x_dir=(0, 0, 1), z_dir=(0, -1, 0))) as fillet1_piece_22b_section:
        with BuildLine():
            CenterArc((FILLET1_R, FILLET1_R), FILLET1_R, 180, 90)
            Line((0, FILLET1_R), (0, 0))
            Line((0, 0), (FILLET1_R, 0))
        make_face()
    fillet1_piece_22b = extrude(amount=20.65, mode=Mode.PRIVATE)
    fillet1_piece_22b = split(fillet1_piece_22b, bisect_by=Plane(origin=(-24.50318, 3.625361, -11.7), z_dir=(0, -1, 0)), keep=Keep.TOP, mode=Mode.PRIVATE)
    fillet1_piece_22 = fillet1_piece_22a & fillet1_piece_22b
    add(fillet1_piece_22, mode=Mode.SUBTRACT)
    with BuildSketch(Plane(origin=(41.89682, 3.625361, 0), x_dir=(0, 0, -1), z_dir=(-1, 0, 0))) as fillet1_piece_23a_section:
        with BuildLine():
            CenterArc((FILLET1_R, FILLET1_R), FILLET1_R, 180, 90)
            Line((0, FILLET1_R), (0, 0))
            Line((0, 0), (FILLET1_R, 0))
        make_face()
    fillet1_piece_23a = extrude(amount=66.4, mode=Mode.PRIVATE)
    fillet1_piece_23a = split(fillet1_piece_23a, bisect_by=Plane(origin=(36.89682, 3.625361, 0), z_dir=(1, 0, 0)), keep=Keep.TOP, mode=Mode.PRIVATE)
    with BuildSketch(Plane(origin=(36.89682, 19.672859, 0), x_dir=(0, 0, -1), z_dir=(0, -1, 0))) as fillet1_piece_23b_section:
        with BuildLine():
            CenterArc((FILLET1_R, FILLET1_R), FILLET1_R, 180, 90)
            Line((0, FILLET1_R), (0, 0))
            Line((0, 0), (FILLET1_R, 0))
        make_face()
    fillet1_piece_23b = extrude(amount=21.047498, mode=Mode.PRIVATE)
    fillet1_piece_23b = split(fillet1_piece_23b, bisect_by=Plane(origin=(36.89682, 3.625361, 0), z_dir=(0, -1, 0)), keep=Keep.TOP, mode=Mode.PRIVATE)
    fillet1_piece_23 = fillet1_piece_23a & fillet1_piece_23b
    add(fillet1_piece_23, mode=Mode.SUBTRACT)
    with BuildSketch(Plane(origin=(36.89682, 3.625361, 0), x_dir=(0, 0, -1), z_dir=(-1, 0, 0))) as fillet1_piece_24a_section:
        with BuildLine():
            CenterArc((FILLET1_R, FILLET1_R), FILLET1_R, 180, 90)
            Line((0, FILLET1_R), (0, 0))
            Line((0, 0), (FILLET1_R, 0))
        make_face()
    fillet1_piece_24a = extrude(amount=66.4, mode=Mode.PRIVATE)
    fillet1_piece_24a = split(fillet1_piece_24a, bisect_by=Plane(origin=(-24.50318, 3.625361, 0), z_dir=(-1, 0, 0)), keep=Keep.TOP, mode=Mode.PRIVATE)
    with BuildSketch(Plane(origin=(-24.50318, -1.374639, 0), x_dir=(0, 0, -1), z_dir=(0, 1, 0))) as fillet1_piece_24b_section:
        with BuildLine():
            CenterArc((FILLET1_R, FILLET1_R), FILLET1_R, 180, 90)
            Line((0, FILLET1_R), (0, 0))
            Line((0, 0), (FILLET1_R, 0))
        make_face()
    fillet1_piece_24b = extrude(amount=21.047498, mode=Mode.PRIVATE)
    fillet1_piece_24b = split(fillet1_piece_24b, bisect_by=Plane(origin=(-24.50318, 3.625361, 0), z_dir=(0, -1, 0)), keep=Keep.TOP, mode=Mode.PRIVATE)
    fillet1_piece_24 = fillet1_piece_24a & fillet1_piece_24b
    add(fillet1_piece_24, mode=Mode.SUBTRACT)

    # Sketch33 → Boss-Extrude2 (add)
    with BuildSketch(Plane.XY):
        with Locations((27.69682, -7.374639)):
            Rectangle(SKETCH33_W, SKETCH33_H)
    extrude(amount=BOSS_EXTRUDE2_DEPTH)

    # Sketch34 → Cut-Extrude21 (cut, through all)
    with BuildSketch(Plane.XY):
        with Locations((6.19682, -14.024639)):
            Rectangle(SKETCH34_W, SKETCH34_H)
    extrude(amount=-CUT_EXTRUDE21_DEPTH, mode=Mode.SUBTRACT)

    # Sketch35 → Cut-Extrude22 (cut)
    with BuildSketch(Plane.XY.offset(CUT_EXTRUDE22_START)):
        Polygon((17.39682, 3.625361), (28.359066, 3.625361), (34.39682, 3.625361), (34.39682, -4.374639), (10.39682, -4.374639), (10.39682, 1.625361), (10.39682, 3.625361), align=None)
    extrude(amount=CUT_EXTRUDE22_DEPTH, mode=Mode.SUBTRACT)

    # Sketch36 → Boss-Extrude4 (add)
    with SkipClean():  # the faces are left unmerged after this step: merging them gives an invalid solid
        with BuildSketch(Plane.XZ.offset(10.024639)):
            with BuildLine():
                Line((26.49682, 3), (26.49682, 0))
                Line((26.49682, 0), (-41.30318, 0))
                ThreePointArc((-41.30318, 0), (-42.717394, -0.585786), (-43.30318, -2))
                Line((-43.30318, -2), (-43.30318, -9.7))
                ThreePointArc((-43.30318, -9.7), (-42.717394, -11.114214), (-41.30318, -11.7))
                Line((-41.30318, -11.7), (53.69682, -11.7))
                ThreePointArc((53.69682, -11.7), (55.111033, -11.114214), (55.69682, -9.7))
                Line((55.69682, -9.7), (55.69682, -2))
                ThreePointArc((55.69682, -2), (55.111033, -0.585786), (53.69682, 0))
                Line((53.69682, 0), (28.89682, 0))
                Line((28.89682, 0), (28.89682, 3))
                Line((28.89682, 3), (26.49682, 3))
            make_face()
        extrude(amount=BOSS_EXTRUDE4_DEPTH)

    # Sketch45 → Cut-Extrude26 (cut, through all)
    with SkipClean():  # the faces are left unmerged after this step: merging them gives an invalid solid
        with BuildSketch(Plane(origin=(0, 0, -11.7), x_dir=(-1, 0, 0), z_dir=(0, 0, -1))):
            with Locations((-21.69682, -14.024639)):
                Rectangle(SKETCH45_W, SKETCH45_H)
        extrude(amount=-CUT_EXTRUDE26_DEPTH, mode=Mode.SUBTRACT)

    # M4 Clearance Hole1 (through all)
    with Locations(Plane(origin=(0, -4.374639, 0), x_dir=(1, 0, 0), z_dir=(0, 1, 0))):
        with Locations((16.39682, 6), (28.39682, 6)):
            Hole(M4_CLEARANCE_HOLE1_D / 2)

    # Sketch46<2> → Cut-Extrude27 (cut)
    with SkipClean():  # the faces are left unmerged after this step: merging them gives an invalid solid
        with BuildSketch(Plane(origin=(0, -4.374639, 0), x_dir=(1, 0, 0), z_dir=(0, 1, 0))):
            with Locations(Location((16.39682, 6, 0), (0, 0, 270))):
                Circle(SKETCH46_2_R)
            with Locations(Location((28.39682, 6, 0), (0, 0, 270))):
                Circle(SKETCH46_2_R)
        extrude(amount=-CUT_EXTRUDE27_DEPTH, mode=Mode.SUBTRACT)

    # Fillet5
    fillet5_edges = [cut_extrude17_piece_1.edges().sort_by_distance(p)[0] for p in [
        (10.39682, -4.374639, -5.85),
        (34.39682, -4.374639, -5.85),
    ]]
    fillet(fillet5_edges, radius=FILLET5_R)


with BuildPart() as cut_extrude17_piece_2:
    # of the separate pieces the step leaves, piece 2, a body of its own (cut_extrude17_pieces)
    add(part.part.solids().sort_by_distance((34.89682, 29.275361, 0))[0])


with BuildPart() as cut_extrude17_piece_3:
    # of the separate pieces the step leaves, piece 3, a body of its own (cut_extrude17_pieces)
    add(part.part.solids().sort_by_distance((-43.30318, 29.275361, 0))[0])


with BuildPart() as cut_extrude20_tool:
    # Sketch32 → Cut-Extrude20 (new, through all)
    with BuildSketch(Plane(origin=(0, 0, -11.7), x_dir=(-1, 0, 0), z_dir=(0, 0, -1))):
        with Locations((-6.19682, 25.275361)):
            Rectangle(SKETCH32_W, SKETCH32_H)
    extrude(amount=-CUT_EXTRUDE20_DEPTH)


with BuildPart() as cut_extrude17_piece_2_1:
    add(cut_extrude17_piece_2.part)

    # Cut-Extrude20: cut by cut_extrude20_tool
    add(cut_extrude20_tool.part, mode=Mode.SUBTRACT)


with BuildPart() as cut_extrude17_piece_3_1:
    add(cut_extrude17_piece_3.part)

    # Cut-Extrude20: cut by cut_extrude20_tool
    add(cut_extrude20_tool.part, mode=Mode.SUBTRACT)


solid = cut_extrude17_piece_1.part
